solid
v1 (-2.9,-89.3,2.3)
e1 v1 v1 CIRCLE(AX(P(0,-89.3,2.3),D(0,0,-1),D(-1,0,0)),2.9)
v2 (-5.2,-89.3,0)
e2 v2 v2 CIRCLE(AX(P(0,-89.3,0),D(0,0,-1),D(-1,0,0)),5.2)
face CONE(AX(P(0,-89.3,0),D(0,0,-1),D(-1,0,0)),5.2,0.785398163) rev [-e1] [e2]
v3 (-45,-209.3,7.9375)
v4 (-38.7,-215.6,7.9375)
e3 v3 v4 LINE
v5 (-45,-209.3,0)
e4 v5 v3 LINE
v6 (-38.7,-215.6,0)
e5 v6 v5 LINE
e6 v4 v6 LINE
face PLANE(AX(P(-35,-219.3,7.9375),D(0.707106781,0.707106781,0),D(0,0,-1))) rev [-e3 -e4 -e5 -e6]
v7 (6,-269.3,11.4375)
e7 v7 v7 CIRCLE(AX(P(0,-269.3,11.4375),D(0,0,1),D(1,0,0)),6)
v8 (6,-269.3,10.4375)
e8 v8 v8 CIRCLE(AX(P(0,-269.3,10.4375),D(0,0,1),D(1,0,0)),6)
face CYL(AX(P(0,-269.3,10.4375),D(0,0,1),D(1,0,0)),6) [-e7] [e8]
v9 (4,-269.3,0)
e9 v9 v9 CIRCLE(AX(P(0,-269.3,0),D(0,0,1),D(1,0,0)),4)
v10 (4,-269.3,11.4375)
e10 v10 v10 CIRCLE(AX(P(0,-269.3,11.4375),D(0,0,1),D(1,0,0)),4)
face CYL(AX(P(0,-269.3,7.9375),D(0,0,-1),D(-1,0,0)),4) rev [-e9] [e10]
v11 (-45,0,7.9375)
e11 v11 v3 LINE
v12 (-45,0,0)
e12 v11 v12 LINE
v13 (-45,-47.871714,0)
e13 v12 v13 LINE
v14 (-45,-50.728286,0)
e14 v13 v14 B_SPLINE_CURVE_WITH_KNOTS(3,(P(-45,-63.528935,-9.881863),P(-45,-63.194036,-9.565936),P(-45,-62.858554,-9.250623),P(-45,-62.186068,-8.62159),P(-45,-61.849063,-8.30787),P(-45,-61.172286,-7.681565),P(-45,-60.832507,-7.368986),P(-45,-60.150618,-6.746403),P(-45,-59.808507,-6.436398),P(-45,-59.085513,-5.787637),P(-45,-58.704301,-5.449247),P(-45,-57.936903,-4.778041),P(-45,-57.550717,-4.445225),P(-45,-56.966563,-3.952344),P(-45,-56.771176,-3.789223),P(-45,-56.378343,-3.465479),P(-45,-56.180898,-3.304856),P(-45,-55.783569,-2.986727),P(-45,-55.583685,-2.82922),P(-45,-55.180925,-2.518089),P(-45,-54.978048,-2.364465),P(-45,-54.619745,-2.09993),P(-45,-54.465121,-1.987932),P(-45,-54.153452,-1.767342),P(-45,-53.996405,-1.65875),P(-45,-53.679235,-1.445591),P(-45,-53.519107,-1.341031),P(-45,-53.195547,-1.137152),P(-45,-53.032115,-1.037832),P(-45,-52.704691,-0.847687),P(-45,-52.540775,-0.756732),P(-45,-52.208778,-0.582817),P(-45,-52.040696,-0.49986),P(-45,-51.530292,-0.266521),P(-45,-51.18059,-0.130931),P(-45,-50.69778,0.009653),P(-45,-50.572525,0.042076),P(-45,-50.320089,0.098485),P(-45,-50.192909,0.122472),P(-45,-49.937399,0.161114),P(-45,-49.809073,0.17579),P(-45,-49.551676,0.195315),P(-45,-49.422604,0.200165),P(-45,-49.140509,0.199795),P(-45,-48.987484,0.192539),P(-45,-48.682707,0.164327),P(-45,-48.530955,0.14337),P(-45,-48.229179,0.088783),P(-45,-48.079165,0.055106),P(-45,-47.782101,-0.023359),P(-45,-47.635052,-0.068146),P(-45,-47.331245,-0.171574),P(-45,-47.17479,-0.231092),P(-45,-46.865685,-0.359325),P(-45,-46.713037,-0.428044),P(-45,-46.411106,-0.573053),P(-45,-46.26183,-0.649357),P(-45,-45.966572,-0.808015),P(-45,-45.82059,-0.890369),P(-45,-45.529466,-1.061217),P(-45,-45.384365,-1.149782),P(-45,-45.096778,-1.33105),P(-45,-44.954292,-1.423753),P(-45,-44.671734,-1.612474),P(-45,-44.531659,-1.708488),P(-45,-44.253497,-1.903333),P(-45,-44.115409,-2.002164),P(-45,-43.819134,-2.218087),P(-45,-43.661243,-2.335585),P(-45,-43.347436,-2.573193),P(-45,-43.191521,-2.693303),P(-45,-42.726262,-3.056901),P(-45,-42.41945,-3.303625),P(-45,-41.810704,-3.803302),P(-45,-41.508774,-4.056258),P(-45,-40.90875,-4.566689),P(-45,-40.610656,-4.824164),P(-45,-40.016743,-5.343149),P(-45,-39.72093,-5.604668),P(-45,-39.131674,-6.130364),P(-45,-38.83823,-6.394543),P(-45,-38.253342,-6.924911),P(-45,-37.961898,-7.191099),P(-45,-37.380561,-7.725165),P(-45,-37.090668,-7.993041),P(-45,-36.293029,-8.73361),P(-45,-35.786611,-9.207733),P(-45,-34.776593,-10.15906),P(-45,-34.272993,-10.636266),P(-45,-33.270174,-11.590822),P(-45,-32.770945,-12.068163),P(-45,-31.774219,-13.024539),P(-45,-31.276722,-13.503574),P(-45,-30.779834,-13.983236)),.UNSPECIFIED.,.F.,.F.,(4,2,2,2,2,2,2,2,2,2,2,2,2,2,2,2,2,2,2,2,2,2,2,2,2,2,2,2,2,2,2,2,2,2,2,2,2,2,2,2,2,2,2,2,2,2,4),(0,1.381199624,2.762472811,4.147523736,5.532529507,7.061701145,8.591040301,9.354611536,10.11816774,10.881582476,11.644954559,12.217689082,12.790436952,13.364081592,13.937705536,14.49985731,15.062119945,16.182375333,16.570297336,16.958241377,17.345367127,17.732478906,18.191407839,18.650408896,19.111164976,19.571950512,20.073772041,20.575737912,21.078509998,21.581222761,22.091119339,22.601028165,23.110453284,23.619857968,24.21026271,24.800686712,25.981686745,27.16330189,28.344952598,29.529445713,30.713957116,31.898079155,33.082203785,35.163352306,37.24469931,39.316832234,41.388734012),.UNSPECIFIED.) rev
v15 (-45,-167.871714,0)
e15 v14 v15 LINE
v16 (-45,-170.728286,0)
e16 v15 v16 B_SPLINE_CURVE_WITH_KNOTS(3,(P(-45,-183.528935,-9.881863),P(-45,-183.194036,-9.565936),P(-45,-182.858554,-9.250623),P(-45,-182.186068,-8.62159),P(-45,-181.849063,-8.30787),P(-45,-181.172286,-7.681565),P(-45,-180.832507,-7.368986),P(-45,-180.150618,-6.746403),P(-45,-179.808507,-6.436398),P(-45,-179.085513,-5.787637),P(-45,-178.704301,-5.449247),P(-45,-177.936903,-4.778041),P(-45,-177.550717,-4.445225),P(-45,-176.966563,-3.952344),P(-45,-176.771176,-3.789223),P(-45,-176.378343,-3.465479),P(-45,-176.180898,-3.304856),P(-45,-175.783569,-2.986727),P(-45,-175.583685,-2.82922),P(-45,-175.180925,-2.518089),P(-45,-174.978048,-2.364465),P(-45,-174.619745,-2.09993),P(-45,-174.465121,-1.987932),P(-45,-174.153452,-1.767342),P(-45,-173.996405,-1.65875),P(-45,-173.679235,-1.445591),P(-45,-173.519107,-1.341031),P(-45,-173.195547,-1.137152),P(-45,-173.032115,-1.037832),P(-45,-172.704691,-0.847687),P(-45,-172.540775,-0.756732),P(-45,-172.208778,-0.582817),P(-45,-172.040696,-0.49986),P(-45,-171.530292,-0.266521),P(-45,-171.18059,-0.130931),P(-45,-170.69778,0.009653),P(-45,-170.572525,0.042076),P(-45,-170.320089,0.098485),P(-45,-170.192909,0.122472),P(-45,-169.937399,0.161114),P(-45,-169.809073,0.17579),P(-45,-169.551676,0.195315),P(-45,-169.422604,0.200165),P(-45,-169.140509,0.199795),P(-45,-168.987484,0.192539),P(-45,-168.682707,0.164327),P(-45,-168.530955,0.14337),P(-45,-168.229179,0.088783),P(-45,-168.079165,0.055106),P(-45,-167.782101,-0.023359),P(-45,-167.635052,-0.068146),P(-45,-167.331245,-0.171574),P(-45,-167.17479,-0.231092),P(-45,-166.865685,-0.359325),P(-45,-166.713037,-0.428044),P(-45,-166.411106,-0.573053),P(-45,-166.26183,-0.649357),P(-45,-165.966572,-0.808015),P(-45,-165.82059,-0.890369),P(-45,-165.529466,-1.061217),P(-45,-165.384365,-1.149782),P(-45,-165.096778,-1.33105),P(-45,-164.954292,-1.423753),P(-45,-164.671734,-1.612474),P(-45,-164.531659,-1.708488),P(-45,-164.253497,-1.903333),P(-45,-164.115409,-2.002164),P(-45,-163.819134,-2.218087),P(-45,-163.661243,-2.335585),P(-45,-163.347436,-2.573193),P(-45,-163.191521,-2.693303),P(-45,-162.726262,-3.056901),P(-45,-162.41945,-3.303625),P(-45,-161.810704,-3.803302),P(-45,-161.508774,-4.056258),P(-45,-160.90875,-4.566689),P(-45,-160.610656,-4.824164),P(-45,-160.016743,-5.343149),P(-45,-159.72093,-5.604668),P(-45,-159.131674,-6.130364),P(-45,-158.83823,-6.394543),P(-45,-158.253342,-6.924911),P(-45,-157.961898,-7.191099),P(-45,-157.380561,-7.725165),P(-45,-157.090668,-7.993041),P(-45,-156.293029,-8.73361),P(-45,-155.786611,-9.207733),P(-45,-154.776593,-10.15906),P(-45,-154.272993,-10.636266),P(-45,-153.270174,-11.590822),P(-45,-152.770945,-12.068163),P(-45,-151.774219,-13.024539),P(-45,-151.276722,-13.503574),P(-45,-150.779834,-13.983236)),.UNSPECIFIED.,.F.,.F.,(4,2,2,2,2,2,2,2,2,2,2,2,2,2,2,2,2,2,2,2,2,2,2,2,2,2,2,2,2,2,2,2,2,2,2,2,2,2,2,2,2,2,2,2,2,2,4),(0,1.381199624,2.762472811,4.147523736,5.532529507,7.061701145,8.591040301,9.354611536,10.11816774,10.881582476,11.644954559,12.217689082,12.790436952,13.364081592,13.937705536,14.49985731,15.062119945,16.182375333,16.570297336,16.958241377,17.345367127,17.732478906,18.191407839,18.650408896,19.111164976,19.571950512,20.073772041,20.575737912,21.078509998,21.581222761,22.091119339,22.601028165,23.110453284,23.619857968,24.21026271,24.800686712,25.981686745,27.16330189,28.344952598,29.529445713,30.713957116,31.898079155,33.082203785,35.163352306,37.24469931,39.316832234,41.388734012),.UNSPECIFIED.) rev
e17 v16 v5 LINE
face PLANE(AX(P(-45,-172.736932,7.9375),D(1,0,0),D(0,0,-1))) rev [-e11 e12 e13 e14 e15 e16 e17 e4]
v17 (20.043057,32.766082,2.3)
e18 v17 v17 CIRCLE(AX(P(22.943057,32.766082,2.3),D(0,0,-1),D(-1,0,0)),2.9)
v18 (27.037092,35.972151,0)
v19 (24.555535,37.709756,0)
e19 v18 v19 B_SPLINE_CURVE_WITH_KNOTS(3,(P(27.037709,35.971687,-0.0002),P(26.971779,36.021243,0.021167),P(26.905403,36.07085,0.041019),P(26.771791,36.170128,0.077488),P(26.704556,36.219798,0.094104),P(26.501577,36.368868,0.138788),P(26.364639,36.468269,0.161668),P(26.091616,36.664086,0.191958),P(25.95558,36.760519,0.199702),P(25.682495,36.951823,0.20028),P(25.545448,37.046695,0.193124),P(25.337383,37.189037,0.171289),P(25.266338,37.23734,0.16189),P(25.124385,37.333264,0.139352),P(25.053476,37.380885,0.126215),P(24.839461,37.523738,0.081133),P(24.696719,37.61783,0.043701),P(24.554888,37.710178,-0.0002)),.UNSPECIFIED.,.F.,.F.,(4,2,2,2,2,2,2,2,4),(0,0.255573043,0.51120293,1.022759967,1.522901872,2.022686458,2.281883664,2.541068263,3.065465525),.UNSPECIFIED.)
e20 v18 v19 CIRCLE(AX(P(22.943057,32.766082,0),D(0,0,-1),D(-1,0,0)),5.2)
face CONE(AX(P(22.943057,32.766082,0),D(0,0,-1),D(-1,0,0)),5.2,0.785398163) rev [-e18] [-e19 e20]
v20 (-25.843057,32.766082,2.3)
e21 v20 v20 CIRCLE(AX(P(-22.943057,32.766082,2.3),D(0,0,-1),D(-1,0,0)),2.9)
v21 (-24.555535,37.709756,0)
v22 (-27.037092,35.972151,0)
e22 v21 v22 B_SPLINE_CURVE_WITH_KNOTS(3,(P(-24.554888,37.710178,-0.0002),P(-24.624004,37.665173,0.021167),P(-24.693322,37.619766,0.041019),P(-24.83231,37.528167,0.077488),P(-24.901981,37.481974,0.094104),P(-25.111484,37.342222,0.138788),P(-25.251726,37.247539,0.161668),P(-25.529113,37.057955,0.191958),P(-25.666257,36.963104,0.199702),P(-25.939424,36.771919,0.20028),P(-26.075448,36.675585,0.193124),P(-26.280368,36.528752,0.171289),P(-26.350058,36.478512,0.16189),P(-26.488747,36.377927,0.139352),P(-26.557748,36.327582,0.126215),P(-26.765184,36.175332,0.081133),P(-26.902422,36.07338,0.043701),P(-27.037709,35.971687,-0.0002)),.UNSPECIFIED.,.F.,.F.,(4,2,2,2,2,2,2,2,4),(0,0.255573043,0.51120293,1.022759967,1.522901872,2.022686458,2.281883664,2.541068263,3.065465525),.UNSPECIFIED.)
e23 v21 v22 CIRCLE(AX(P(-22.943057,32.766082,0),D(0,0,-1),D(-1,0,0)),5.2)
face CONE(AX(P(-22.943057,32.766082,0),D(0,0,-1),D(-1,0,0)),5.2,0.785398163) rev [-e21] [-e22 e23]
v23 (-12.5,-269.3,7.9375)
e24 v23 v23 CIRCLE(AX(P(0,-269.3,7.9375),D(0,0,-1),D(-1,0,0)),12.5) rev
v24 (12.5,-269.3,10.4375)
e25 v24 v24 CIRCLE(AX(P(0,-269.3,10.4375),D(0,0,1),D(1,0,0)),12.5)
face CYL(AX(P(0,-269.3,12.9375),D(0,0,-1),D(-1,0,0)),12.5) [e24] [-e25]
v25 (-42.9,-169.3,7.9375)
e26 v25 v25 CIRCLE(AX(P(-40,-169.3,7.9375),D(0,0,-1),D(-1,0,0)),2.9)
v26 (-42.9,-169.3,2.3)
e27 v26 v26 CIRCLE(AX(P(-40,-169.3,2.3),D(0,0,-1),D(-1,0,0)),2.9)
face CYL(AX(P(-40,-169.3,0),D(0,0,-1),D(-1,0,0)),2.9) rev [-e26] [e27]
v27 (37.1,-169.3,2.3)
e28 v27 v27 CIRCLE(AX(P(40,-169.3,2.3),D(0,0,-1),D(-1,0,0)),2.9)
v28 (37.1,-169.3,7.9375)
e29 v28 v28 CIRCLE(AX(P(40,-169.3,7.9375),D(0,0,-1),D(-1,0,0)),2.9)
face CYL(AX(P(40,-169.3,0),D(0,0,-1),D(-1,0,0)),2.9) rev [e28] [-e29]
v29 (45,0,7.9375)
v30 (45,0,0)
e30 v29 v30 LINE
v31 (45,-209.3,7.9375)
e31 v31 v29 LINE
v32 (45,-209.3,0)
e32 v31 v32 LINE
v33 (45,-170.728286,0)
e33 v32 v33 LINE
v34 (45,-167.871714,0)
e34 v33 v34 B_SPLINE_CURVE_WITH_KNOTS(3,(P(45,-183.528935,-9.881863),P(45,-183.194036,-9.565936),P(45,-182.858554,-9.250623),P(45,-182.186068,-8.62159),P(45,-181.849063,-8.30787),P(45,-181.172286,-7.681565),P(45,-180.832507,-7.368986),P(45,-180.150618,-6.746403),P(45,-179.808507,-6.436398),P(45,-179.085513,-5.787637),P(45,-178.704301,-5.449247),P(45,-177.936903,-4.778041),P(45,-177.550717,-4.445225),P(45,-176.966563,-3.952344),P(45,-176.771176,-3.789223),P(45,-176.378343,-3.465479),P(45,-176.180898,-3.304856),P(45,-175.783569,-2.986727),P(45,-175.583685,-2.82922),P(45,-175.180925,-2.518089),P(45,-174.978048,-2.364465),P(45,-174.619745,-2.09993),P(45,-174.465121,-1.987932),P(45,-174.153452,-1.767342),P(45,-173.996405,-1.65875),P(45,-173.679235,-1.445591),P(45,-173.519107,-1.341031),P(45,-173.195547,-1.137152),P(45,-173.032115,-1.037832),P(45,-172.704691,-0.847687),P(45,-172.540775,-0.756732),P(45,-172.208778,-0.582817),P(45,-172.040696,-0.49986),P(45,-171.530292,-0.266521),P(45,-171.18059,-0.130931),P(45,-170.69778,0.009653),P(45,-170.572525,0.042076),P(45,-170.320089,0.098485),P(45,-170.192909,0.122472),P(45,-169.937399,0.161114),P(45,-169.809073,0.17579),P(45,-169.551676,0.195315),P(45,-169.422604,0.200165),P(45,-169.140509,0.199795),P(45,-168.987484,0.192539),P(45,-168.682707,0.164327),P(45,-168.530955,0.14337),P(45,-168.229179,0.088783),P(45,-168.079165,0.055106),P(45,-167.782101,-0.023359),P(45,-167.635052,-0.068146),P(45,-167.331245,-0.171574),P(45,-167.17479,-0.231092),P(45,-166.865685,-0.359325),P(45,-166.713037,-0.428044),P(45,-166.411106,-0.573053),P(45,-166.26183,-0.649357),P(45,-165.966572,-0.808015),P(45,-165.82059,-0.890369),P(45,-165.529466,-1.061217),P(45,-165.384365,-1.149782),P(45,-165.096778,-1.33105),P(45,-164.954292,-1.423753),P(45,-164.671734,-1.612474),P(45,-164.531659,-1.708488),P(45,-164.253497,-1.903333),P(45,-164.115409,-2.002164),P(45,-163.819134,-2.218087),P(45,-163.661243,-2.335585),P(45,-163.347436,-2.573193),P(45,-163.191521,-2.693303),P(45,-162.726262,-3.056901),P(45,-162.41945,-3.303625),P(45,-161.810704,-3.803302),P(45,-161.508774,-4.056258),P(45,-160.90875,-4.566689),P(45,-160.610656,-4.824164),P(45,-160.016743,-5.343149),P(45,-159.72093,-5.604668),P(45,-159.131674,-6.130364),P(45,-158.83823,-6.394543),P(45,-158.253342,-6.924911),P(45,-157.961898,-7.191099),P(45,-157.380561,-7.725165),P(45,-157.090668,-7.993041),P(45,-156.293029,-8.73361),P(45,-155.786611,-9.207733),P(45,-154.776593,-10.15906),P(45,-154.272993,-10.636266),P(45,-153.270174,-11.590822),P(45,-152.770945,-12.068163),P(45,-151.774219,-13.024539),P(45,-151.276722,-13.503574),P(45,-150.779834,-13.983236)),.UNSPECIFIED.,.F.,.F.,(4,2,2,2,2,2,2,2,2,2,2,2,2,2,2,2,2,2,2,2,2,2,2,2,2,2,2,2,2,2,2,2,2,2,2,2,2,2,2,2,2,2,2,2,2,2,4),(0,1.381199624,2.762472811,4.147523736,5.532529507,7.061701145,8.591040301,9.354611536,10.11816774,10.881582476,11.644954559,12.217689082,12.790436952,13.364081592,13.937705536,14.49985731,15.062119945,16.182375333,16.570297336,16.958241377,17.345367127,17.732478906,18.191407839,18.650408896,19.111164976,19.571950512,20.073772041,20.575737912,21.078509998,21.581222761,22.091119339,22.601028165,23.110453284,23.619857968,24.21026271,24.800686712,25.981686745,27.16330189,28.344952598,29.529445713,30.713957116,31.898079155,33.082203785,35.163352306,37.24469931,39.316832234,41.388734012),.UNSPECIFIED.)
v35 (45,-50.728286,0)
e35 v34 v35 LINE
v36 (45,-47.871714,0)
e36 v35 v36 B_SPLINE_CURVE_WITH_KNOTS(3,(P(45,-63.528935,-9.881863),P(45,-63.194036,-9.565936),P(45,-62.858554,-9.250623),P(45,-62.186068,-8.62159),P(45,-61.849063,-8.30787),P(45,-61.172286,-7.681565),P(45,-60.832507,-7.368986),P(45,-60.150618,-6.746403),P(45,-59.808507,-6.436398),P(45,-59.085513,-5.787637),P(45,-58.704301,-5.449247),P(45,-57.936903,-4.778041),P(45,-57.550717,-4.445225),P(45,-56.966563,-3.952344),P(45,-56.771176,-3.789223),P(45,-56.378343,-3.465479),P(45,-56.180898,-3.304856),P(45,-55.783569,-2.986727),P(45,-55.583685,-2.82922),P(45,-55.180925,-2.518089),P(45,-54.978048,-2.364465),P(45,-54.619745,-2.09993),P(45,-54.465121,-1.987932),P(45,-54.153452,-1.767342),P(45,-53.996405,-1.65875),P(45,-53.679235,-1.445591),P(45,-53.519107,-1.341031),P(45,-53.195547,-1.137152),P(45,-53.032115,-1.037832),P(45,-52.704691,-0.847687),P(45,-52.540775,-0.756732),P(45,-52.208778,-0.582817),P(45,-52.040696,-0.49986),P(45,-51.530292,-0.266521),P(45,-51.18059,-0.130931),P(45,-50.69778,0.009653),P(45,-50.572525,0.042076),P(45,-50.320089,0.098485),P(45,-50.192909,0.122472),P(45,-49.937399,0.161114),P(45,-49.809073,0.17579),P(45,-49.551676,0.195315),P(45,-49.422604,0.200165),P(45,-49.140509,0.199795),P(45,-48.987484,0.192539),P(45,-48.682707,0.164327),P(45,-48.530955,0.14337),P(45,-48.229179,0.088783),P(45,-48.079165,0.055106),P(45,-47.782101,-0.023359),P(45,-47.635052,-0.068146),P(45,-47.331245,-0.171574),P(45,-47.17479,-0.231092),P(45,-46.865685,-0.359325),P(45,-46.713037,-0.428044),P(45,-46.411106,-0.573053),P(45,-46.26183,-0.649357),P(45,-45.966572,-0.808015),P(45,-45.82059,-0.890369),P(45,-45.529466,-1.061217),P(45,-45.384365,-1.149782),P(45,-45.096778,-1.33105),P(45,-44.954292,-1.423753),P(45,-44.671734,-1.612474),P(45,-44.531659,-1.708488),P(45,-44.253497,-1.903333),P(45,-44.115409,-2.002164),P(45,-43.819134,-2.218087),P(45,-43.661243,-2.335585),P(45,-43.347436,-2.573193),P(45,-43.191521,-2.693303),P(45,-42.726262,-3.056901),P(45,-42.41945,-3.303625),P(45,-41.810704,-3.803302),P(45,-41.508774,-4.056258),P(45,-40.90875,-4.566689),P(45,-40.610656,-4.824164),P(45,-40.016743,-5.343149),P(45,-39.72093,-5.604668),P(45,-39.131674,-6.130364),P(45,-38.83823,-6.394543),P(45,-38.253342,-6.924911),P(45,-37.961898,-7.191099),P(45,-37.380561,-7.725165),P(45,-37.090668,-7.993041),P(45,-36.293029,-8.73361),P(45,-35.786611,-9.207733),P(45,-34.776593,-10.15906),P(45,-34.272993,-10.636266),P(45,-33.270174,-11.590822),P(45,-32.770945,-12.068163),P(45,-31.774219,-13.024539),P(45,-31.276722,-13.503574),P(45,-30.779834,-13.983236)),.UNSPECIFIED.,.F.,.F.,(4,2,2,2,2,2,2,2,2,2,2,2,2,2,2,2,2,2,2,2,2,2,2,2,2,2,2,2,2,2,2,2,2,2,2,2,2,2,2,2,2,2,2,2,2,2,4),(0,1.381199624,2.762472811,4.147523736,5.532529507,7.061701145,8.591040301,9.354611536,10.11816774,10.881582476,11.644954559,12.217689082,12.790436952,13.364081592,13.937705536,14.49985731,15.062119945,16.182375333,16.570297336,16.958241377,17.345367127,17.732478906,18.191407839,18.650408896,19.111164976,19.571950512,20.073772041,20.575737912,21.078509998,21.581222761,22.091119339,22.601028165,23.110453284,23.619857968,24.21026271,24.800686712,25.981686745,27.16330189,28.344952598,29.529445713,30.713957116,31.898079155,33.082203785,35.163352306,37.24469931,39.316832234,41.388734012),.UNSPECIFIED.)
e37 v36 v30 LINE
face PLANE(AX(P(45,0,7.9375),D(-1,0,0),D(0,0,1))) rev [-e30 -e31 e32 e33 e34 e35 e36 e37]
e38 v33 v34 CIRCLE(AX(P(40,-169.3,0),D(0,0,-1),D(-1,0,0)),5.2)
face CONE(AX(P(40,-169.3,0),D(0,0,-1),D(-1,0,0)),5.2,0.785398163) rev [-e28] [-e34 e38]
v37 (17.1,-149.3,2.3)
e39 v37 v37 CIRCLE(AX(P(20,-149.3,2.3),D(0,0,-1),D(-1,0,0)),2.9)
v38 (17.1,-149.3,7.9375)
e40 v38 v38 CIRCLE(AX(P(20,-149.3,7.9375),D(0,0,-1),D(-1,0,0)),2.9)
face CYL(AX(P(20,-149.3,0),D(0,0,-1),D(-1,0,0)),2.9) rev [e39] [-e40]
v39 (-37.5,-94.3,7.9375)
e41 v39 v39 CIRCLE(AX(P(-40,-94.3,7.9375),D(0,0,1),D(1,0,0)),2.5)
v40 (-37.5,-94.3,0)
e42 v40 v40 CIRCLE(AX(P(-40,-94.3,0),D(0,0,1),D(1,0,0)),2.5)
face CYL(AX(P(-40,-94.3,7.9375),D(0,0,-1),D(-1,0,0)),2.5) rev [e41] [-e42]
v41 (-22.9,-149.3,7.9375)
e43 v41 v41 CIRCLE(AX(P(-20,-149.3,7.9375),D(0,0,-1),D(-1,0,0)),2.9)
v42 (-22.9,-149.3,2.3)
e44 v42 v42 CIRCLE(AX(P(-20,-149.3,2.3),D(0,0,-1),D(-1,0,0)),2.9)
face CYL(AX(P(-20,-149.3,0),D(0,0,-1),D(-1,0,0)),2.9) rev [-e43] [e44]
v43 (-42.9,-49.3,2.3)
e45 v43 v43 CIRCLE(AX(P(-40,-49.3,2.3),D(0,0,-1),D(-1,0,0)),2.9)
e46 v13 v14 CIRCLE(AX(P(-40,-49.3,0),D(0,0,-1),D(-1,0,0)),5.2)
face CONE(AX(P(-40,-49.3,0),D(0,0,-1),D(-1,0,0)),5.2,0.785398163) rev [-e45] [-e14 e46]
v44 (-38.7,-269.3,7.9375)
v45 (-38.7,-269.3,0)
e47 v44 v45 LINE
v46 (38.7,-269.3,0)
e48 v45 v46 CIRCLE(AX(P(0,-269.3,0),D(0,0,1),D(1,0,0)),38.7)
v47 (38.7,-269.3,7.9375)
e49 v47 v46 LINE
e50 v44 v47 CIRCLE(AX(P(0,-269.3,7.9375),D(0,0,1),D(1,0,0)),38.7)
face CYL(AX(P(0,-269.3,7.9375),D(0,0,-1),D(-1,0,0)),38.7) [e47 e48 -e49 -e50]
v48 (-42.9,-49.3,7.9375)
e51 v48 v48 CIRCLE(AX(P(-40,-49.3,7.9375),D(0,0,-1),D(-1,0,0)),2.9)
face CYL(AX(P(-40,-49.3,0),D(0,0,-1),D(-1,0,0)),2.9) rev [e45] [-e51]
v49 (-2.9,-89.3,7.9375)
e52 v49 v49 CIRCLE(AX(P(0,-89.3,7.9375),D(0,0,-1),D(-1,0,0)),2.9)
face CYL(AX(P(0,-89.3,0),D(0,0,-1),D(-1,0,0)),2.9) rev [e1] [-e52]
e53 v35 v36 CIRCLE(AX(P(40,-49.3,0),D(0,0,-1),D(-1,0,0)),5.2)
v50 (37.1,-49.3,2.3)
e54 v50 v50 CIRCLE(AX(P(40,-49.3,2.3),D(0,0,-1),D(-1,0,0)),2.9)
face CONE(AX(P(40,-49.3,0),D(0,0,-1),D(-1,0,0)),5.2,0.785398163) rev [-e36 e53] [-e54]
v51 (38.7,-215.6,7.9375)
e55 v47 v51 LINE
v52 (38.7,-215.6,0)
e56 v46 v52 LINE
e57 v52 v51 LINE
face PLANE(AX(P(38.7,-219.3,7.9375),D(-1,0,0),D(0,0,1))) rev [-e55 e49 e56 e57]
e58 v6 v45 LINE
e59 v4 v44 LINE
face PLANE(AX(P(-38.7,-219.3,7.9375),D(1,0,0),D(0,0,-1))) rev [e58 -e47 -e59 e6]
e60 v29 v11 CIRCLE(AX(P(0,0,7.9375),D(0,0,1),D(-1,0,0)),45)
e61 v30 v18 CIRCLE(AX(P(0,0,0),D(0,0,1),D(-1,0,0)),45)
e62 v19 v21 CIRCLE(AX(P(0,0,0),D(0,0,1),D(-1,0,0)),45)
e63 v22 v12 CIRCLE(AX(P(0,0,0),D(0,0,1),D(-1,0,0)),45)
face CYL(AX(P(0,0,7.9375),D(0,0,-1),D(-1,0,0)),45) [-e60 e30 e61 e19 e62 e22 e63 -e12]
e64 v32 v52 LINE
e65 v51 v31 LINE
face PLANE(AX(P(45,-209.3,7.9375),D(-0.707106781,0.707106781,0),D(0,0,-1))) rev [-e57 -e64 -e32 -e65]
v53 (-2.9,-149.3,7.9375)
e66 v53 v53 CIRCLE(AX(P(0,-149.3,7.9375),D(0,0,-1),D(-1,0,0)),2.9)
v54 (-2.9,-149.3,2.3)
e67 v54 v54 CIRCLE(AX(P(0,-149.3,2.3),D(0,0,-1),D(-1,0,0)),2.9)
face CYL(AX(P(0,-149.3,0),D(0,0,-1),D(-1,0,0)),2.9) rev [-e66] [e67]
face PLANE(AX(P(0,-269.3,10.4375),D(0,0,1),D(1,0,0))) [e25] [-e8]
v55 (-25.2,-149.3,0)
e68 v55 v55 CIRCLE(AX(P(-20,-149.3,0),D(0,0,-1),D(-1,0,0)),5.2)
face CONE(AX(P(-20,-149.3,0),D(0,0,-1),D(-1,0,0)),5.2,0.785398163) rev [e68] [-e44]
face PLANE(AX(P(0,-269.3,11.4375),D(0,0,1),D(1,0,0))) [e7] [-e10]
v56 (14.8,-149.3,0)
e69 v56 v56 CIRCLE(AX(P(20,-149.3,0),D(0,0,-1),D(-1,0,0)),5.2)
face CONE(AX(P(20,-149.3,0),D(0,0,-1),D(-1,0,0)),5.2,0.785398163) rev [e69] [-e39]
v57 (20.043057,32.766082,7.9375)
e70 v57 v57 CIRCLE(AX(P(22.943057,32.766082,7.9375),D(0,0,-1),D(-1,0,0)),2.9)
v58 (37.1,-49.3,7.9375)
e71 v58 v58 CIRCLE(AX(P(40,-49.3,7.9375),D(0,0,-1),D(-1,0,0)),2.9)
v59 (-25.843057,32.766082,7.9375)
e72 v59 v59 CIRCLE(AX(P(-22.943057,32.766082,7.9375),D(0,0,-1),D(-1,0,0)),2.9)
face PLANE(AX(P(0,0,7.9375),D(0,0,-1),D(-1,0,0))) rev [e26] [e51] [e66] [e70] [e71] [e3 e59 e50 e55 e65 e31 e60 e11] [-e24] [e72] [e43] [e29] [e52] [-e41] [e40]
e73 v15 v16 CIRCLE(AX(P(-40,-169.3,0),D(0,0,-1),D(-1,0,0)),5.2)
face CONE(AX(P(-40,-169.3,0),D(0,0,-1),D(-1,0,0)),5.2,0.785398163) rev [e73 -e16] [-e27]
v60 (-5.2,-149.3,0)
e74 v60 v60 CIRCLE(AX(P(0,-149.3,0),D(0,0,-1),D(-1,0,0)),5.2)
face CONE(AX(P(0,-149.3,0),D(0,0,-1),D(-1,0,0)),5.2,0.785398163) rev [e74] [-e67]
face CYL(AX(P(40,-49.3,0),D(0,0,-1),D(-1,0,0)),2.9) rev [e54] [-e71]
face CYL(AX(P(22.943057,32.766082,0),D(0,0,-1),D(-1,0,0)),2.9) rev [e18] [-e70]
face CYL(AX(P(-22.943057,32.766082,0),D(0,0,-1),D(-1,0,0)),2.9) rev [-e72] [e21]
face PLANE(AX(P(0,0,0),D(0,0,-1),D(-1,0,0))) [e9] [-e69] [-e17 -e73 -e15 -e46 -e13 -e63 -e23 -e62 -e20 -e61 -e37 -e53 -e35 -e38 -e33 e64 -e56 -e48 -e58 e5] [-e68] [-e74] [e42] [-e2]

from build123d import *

# Parameters (mm, degrees)
SKETCH1_R                                       = 4
SKETCH1_R_2                                     = 2.5
BOSS_EXTRUDE1_DEPTH                             = 7.9375
SKETCH3_R                                       = 12.5
SKETCH3_R_2                                     = 4
BOSS_EXTRUDE2_DEPTH                             = 5
CUT_EXTRUDE1_START                              = -2.5
SKETCH4_R                                       = 12.5
SKETCH4_R_2                                     = 6
CUT_EXTRUDE1_DEPTH                              = 2.5
CHAMFER1_SIZE                                   = 10
CUT_EXTRUDE2_START                              = -1.5
SKETCH5_R                                       = 6
CUT_EXTRUDE2_DEPTH                              = 1.5
CSK_FOR_M5_OVAL_HEAD_MACHINE_SCREW2_D           = 5.8
CSK_FOR_M5_OVAL_HEAD_MACHINE_SCREW2_CSINK_D     = 10.4
CSK_FOR_M5_OVAL_HEAD_MACHINE_SCREW2_CSINK_ANGLE = 90
CSK_FOR_M5_OVAL_HEAD_MACHINE_SCREW3_D           = 5.8
CSK_FOR_M5_OVAL_HEAD_MACHINE_SCREW3_CSINK_D     = 10.4
CSK_FOR_M5_OVAL_HEAD_MACHINE_SCREW3_CSINK_ANGLE = 90


with BuildPart() as part:
    # Sketch1 → Boss-Extrude1 (new body)
    with BuildSketch(Plane.XY):
        with BuildLine():
            Line((-45, 0), (-45, -65.863068229))
            Line((-45, -65.863068229), (-45, -72.736931771))
            Line((-45, -72.736931771), (-45, -165.863068229))
            Line((-45, -165.863068229), (-45, -172.736931771))
            Line((-45, -172.736931771), (-45, -219.3))
            Line((-45, -219.3), (-38.7, -219.3))
            Line((-38.7, -219.3), (-38.7, -269.3))
            ThreePointArc((-38.7, -269.3), (0, -308), (38.7, -269.3))
            Line((38.7, -269.3), (38.7, -219.3))
            Line((38.7, -219.3), (45, -219.3))
            Line((45, -219.3), (45, -172.736931771))
            Line((45, -172.736931771), (45, -165.863068229))
            Line((45, -165.863068229), (45, -72.736931771))
            Line((45, -72.736931771), (45, -65.863068229))
            Line((45, -65.863068229), (45, 0))
            ThreePointArc((45, 0), (0, 45), (-45, 0))
        make_face()
        with Locations((0, -269.3)):
            Circle(SKETCH1_R, mode=Mode.SUBTRACT)
        with Locations((0, -89.3)):
            Circle(SKETCH1_R_2, mode=Mode.SUBTRACT)
        with Locations((0, -149.3)):
            Circle(SKETCH1_R_2, mode=Mode.SUBTRACT)
        with Locations((20, -149.3)):
            Circle(SKETCH1_R_2, mode=Mode.SUBTRACT)
        with Locations(Location((-20, -149.3, 0), (0, 0, 180))):
            Circle(SKETCH1_R_2, mode=Mode.SUBTRACT)
        with Locations((-40, -49.3)):
            Circle(SKETCH1_R_2, mode=Mode.SUBTRACT)
        with Locations((-40, -169.3)):
            Circle(SKETCH1_R_2, mode=Mode.SUBTRACT)
        with Locations(Location((40, -169.3, 0), (0, 0, 180))):
            Circle(SKETCH1_R_2, mode=Mode.SUBTRACT)
        with Locations(Location((40, -49.3, 0), (0, 0, 180))):
            Circle(SKETCH1_R_2, mode=Mode.SUBTRACT)
        with Locations((-22.943057454, 32.766081772)):
            Circle(SKETCH1_R_2, mode=Mode.SUBTRACT)
        with Locations((22.943057454, 32.766081772)):
            Circle(SKETCH1_R_2, mode=Mode.SUBTRACT)
        with Locations((-40, -94.3)):
            Circle(SKETCH1_R_2, mode=Mode.SUBTRACT)
    extrude(amount=BOSS_EXTRUDE1_DEPTH)

    # Sketch3 → Boss-Extrude2 (add)
    with BuildSketch(Plane.XY.offset(7.9375)):
        with Locations(Location((0, -269.3, 0), (0, 0, 180))):
            Circle(SKETCH3_R)
        with Locations((0, -269.3)):
            Circle(SKETCH3_R_2, mode=Mode.SUBTRACT)
    extrude(amount=BOSS_EXTRUDE2_DEPTH)

    # Sketch4 → Cut-Extrude1 (cut)
    with BuildSketch(Plane.XY.offset(12.9375).offset(CUT_EXTRUDE1_START)):
        with Locations(Location((0, -269.3, 0), (0, 0, 180))):
            Circle(SKETCH4_R)
        with Locations((0, -269.3)):
            Circle(SKETCH4_R_2, mode=Mode.SUBTRACT)
    extrude(amount=CUT_EXTRUDE1_DEPTH, mode=Mode.SUBTRACT)

    # Chamfer1
    # the kernel refuses this chamfer: 10 mm, written as the material it takes off along each edge
    with BuildSketch(Plane(origin=(45, -219.3, -25.71682988), x_dir=(0.027495876610586282, 0.9996219169112968, 0), z_dir=(0, 0, 1))) as chamfer1_piece_1_section:
        Polygon((CHAMFER1_SIZE * 0.999621916911, CHAMFER1_SIZE * 0.0274958766106), (-CHAMFER1_SIZE * 0.0274958766106, CHAMFER1_SIZE * 0.999621916911), (0, 0), align=None)
    chamfer1_piece_1 = extrude(amount=59.371159759, mode=Mode.PRIVATE)
    chamfer1_piece_1 = split(chamfer1_piece_1, bisect_by=Plane(origin=(38.7, -215.600664049, 3.96875), z_dir=(1, 0, 0)), keep=Keep.TOP, mode=Mode.PRIVATE)
    add(chamfer1_piece_1, mode=Mode.SUBTRACT)
    with BuildSketch(Plane(origin=(-45, -219.3, -25.71682988), x_dir=(-0.027495876610586282, 0.9996219169112968, 0), z_dir=(0, 0, 1))) as chamfer1_piece_2_section:
        Polygon((CHAMFER1_SIZE * 0.999621916911, -CHAMFER1_SIZE * 0.0274958766106), (-CHAMFER1_SIZE * 0.0274958766106, -CHAMFER1_SIZE * 0.999621916911), (0, 0), align=None)
    chamfer1_piece_2 = extrude(amount=59.371159759, mode=Mode.PRIVATE)
    chamfer1_piece_2 = split(chamfer1_piece_2, bisect_by=Plane(origin=(-38.7, -215.600664049, 3.96875), z_dir=(-1, 0, 0)), keep=Keep.TOP, mode=Mode.PRIVATE)
    add(chamfer1_piece_2, mode=Mode.SUBTRACT)

    # Sketch5 → Cut-Extrude2 (cut)
    with BuildSketch(Plane.XY.offset(12.9375).offset(CUT_EXTRUDE2_START)):
        with Locations((0, -269.3)):
            Circle(SKETCH5_R)
    extrude(amount=CUT_EXTRUDE2_DEPTH, mode=Mode.SUBTRACT)

    # CSK for M5 Oval Head Machine Screw2 (through all)
    with Locations(Plane(origin=(40, -49.3, 0), x_dir=(-1, 0, 0), z_dir=(0, 0, -1))):
        with Locations((0, 0), (40, -40), (80, 0), (80, -120), (60, -100), (40, -100), (20, -100), (0, -120)):
            CounterSinkHole(CSK_FOR_M5_OVAL_HEAD_MACHINE_SCREW2_D / 2, CSK_FOR_M5_OVAL_HEAD_MACHINE_SCREW2_CSINK_D / 2, counter_sink_angle=CSK_FOR_M5_OVAL_HEAD_MACHINE_SCREW2_CSINK_ANGLE)

    # CSK for M5 Oval Head Machine Screw3 (through all)
    with Locations(Plane(origin=(22.943057454, 32.766081772, 0), x_dir=(-1, 0, 0), z_dir=(0, 0, -1))):
        with Locations((0, 0), (45.886114908, 0)):
            CounterSinkHole(CSK_FOR_M5_OVAL_HEAD_MACHINE_SCREW3_D / 2, CSK_FOR_M5_OVAL_HEAD_MACHINE_SCREW3_CSINK_D / 2, counter_sink_angle=CSK_FOR_M5_OVAL_HEAD_MACHINE_SCREW3_CSINK_ANGLE)


solid = part.part
